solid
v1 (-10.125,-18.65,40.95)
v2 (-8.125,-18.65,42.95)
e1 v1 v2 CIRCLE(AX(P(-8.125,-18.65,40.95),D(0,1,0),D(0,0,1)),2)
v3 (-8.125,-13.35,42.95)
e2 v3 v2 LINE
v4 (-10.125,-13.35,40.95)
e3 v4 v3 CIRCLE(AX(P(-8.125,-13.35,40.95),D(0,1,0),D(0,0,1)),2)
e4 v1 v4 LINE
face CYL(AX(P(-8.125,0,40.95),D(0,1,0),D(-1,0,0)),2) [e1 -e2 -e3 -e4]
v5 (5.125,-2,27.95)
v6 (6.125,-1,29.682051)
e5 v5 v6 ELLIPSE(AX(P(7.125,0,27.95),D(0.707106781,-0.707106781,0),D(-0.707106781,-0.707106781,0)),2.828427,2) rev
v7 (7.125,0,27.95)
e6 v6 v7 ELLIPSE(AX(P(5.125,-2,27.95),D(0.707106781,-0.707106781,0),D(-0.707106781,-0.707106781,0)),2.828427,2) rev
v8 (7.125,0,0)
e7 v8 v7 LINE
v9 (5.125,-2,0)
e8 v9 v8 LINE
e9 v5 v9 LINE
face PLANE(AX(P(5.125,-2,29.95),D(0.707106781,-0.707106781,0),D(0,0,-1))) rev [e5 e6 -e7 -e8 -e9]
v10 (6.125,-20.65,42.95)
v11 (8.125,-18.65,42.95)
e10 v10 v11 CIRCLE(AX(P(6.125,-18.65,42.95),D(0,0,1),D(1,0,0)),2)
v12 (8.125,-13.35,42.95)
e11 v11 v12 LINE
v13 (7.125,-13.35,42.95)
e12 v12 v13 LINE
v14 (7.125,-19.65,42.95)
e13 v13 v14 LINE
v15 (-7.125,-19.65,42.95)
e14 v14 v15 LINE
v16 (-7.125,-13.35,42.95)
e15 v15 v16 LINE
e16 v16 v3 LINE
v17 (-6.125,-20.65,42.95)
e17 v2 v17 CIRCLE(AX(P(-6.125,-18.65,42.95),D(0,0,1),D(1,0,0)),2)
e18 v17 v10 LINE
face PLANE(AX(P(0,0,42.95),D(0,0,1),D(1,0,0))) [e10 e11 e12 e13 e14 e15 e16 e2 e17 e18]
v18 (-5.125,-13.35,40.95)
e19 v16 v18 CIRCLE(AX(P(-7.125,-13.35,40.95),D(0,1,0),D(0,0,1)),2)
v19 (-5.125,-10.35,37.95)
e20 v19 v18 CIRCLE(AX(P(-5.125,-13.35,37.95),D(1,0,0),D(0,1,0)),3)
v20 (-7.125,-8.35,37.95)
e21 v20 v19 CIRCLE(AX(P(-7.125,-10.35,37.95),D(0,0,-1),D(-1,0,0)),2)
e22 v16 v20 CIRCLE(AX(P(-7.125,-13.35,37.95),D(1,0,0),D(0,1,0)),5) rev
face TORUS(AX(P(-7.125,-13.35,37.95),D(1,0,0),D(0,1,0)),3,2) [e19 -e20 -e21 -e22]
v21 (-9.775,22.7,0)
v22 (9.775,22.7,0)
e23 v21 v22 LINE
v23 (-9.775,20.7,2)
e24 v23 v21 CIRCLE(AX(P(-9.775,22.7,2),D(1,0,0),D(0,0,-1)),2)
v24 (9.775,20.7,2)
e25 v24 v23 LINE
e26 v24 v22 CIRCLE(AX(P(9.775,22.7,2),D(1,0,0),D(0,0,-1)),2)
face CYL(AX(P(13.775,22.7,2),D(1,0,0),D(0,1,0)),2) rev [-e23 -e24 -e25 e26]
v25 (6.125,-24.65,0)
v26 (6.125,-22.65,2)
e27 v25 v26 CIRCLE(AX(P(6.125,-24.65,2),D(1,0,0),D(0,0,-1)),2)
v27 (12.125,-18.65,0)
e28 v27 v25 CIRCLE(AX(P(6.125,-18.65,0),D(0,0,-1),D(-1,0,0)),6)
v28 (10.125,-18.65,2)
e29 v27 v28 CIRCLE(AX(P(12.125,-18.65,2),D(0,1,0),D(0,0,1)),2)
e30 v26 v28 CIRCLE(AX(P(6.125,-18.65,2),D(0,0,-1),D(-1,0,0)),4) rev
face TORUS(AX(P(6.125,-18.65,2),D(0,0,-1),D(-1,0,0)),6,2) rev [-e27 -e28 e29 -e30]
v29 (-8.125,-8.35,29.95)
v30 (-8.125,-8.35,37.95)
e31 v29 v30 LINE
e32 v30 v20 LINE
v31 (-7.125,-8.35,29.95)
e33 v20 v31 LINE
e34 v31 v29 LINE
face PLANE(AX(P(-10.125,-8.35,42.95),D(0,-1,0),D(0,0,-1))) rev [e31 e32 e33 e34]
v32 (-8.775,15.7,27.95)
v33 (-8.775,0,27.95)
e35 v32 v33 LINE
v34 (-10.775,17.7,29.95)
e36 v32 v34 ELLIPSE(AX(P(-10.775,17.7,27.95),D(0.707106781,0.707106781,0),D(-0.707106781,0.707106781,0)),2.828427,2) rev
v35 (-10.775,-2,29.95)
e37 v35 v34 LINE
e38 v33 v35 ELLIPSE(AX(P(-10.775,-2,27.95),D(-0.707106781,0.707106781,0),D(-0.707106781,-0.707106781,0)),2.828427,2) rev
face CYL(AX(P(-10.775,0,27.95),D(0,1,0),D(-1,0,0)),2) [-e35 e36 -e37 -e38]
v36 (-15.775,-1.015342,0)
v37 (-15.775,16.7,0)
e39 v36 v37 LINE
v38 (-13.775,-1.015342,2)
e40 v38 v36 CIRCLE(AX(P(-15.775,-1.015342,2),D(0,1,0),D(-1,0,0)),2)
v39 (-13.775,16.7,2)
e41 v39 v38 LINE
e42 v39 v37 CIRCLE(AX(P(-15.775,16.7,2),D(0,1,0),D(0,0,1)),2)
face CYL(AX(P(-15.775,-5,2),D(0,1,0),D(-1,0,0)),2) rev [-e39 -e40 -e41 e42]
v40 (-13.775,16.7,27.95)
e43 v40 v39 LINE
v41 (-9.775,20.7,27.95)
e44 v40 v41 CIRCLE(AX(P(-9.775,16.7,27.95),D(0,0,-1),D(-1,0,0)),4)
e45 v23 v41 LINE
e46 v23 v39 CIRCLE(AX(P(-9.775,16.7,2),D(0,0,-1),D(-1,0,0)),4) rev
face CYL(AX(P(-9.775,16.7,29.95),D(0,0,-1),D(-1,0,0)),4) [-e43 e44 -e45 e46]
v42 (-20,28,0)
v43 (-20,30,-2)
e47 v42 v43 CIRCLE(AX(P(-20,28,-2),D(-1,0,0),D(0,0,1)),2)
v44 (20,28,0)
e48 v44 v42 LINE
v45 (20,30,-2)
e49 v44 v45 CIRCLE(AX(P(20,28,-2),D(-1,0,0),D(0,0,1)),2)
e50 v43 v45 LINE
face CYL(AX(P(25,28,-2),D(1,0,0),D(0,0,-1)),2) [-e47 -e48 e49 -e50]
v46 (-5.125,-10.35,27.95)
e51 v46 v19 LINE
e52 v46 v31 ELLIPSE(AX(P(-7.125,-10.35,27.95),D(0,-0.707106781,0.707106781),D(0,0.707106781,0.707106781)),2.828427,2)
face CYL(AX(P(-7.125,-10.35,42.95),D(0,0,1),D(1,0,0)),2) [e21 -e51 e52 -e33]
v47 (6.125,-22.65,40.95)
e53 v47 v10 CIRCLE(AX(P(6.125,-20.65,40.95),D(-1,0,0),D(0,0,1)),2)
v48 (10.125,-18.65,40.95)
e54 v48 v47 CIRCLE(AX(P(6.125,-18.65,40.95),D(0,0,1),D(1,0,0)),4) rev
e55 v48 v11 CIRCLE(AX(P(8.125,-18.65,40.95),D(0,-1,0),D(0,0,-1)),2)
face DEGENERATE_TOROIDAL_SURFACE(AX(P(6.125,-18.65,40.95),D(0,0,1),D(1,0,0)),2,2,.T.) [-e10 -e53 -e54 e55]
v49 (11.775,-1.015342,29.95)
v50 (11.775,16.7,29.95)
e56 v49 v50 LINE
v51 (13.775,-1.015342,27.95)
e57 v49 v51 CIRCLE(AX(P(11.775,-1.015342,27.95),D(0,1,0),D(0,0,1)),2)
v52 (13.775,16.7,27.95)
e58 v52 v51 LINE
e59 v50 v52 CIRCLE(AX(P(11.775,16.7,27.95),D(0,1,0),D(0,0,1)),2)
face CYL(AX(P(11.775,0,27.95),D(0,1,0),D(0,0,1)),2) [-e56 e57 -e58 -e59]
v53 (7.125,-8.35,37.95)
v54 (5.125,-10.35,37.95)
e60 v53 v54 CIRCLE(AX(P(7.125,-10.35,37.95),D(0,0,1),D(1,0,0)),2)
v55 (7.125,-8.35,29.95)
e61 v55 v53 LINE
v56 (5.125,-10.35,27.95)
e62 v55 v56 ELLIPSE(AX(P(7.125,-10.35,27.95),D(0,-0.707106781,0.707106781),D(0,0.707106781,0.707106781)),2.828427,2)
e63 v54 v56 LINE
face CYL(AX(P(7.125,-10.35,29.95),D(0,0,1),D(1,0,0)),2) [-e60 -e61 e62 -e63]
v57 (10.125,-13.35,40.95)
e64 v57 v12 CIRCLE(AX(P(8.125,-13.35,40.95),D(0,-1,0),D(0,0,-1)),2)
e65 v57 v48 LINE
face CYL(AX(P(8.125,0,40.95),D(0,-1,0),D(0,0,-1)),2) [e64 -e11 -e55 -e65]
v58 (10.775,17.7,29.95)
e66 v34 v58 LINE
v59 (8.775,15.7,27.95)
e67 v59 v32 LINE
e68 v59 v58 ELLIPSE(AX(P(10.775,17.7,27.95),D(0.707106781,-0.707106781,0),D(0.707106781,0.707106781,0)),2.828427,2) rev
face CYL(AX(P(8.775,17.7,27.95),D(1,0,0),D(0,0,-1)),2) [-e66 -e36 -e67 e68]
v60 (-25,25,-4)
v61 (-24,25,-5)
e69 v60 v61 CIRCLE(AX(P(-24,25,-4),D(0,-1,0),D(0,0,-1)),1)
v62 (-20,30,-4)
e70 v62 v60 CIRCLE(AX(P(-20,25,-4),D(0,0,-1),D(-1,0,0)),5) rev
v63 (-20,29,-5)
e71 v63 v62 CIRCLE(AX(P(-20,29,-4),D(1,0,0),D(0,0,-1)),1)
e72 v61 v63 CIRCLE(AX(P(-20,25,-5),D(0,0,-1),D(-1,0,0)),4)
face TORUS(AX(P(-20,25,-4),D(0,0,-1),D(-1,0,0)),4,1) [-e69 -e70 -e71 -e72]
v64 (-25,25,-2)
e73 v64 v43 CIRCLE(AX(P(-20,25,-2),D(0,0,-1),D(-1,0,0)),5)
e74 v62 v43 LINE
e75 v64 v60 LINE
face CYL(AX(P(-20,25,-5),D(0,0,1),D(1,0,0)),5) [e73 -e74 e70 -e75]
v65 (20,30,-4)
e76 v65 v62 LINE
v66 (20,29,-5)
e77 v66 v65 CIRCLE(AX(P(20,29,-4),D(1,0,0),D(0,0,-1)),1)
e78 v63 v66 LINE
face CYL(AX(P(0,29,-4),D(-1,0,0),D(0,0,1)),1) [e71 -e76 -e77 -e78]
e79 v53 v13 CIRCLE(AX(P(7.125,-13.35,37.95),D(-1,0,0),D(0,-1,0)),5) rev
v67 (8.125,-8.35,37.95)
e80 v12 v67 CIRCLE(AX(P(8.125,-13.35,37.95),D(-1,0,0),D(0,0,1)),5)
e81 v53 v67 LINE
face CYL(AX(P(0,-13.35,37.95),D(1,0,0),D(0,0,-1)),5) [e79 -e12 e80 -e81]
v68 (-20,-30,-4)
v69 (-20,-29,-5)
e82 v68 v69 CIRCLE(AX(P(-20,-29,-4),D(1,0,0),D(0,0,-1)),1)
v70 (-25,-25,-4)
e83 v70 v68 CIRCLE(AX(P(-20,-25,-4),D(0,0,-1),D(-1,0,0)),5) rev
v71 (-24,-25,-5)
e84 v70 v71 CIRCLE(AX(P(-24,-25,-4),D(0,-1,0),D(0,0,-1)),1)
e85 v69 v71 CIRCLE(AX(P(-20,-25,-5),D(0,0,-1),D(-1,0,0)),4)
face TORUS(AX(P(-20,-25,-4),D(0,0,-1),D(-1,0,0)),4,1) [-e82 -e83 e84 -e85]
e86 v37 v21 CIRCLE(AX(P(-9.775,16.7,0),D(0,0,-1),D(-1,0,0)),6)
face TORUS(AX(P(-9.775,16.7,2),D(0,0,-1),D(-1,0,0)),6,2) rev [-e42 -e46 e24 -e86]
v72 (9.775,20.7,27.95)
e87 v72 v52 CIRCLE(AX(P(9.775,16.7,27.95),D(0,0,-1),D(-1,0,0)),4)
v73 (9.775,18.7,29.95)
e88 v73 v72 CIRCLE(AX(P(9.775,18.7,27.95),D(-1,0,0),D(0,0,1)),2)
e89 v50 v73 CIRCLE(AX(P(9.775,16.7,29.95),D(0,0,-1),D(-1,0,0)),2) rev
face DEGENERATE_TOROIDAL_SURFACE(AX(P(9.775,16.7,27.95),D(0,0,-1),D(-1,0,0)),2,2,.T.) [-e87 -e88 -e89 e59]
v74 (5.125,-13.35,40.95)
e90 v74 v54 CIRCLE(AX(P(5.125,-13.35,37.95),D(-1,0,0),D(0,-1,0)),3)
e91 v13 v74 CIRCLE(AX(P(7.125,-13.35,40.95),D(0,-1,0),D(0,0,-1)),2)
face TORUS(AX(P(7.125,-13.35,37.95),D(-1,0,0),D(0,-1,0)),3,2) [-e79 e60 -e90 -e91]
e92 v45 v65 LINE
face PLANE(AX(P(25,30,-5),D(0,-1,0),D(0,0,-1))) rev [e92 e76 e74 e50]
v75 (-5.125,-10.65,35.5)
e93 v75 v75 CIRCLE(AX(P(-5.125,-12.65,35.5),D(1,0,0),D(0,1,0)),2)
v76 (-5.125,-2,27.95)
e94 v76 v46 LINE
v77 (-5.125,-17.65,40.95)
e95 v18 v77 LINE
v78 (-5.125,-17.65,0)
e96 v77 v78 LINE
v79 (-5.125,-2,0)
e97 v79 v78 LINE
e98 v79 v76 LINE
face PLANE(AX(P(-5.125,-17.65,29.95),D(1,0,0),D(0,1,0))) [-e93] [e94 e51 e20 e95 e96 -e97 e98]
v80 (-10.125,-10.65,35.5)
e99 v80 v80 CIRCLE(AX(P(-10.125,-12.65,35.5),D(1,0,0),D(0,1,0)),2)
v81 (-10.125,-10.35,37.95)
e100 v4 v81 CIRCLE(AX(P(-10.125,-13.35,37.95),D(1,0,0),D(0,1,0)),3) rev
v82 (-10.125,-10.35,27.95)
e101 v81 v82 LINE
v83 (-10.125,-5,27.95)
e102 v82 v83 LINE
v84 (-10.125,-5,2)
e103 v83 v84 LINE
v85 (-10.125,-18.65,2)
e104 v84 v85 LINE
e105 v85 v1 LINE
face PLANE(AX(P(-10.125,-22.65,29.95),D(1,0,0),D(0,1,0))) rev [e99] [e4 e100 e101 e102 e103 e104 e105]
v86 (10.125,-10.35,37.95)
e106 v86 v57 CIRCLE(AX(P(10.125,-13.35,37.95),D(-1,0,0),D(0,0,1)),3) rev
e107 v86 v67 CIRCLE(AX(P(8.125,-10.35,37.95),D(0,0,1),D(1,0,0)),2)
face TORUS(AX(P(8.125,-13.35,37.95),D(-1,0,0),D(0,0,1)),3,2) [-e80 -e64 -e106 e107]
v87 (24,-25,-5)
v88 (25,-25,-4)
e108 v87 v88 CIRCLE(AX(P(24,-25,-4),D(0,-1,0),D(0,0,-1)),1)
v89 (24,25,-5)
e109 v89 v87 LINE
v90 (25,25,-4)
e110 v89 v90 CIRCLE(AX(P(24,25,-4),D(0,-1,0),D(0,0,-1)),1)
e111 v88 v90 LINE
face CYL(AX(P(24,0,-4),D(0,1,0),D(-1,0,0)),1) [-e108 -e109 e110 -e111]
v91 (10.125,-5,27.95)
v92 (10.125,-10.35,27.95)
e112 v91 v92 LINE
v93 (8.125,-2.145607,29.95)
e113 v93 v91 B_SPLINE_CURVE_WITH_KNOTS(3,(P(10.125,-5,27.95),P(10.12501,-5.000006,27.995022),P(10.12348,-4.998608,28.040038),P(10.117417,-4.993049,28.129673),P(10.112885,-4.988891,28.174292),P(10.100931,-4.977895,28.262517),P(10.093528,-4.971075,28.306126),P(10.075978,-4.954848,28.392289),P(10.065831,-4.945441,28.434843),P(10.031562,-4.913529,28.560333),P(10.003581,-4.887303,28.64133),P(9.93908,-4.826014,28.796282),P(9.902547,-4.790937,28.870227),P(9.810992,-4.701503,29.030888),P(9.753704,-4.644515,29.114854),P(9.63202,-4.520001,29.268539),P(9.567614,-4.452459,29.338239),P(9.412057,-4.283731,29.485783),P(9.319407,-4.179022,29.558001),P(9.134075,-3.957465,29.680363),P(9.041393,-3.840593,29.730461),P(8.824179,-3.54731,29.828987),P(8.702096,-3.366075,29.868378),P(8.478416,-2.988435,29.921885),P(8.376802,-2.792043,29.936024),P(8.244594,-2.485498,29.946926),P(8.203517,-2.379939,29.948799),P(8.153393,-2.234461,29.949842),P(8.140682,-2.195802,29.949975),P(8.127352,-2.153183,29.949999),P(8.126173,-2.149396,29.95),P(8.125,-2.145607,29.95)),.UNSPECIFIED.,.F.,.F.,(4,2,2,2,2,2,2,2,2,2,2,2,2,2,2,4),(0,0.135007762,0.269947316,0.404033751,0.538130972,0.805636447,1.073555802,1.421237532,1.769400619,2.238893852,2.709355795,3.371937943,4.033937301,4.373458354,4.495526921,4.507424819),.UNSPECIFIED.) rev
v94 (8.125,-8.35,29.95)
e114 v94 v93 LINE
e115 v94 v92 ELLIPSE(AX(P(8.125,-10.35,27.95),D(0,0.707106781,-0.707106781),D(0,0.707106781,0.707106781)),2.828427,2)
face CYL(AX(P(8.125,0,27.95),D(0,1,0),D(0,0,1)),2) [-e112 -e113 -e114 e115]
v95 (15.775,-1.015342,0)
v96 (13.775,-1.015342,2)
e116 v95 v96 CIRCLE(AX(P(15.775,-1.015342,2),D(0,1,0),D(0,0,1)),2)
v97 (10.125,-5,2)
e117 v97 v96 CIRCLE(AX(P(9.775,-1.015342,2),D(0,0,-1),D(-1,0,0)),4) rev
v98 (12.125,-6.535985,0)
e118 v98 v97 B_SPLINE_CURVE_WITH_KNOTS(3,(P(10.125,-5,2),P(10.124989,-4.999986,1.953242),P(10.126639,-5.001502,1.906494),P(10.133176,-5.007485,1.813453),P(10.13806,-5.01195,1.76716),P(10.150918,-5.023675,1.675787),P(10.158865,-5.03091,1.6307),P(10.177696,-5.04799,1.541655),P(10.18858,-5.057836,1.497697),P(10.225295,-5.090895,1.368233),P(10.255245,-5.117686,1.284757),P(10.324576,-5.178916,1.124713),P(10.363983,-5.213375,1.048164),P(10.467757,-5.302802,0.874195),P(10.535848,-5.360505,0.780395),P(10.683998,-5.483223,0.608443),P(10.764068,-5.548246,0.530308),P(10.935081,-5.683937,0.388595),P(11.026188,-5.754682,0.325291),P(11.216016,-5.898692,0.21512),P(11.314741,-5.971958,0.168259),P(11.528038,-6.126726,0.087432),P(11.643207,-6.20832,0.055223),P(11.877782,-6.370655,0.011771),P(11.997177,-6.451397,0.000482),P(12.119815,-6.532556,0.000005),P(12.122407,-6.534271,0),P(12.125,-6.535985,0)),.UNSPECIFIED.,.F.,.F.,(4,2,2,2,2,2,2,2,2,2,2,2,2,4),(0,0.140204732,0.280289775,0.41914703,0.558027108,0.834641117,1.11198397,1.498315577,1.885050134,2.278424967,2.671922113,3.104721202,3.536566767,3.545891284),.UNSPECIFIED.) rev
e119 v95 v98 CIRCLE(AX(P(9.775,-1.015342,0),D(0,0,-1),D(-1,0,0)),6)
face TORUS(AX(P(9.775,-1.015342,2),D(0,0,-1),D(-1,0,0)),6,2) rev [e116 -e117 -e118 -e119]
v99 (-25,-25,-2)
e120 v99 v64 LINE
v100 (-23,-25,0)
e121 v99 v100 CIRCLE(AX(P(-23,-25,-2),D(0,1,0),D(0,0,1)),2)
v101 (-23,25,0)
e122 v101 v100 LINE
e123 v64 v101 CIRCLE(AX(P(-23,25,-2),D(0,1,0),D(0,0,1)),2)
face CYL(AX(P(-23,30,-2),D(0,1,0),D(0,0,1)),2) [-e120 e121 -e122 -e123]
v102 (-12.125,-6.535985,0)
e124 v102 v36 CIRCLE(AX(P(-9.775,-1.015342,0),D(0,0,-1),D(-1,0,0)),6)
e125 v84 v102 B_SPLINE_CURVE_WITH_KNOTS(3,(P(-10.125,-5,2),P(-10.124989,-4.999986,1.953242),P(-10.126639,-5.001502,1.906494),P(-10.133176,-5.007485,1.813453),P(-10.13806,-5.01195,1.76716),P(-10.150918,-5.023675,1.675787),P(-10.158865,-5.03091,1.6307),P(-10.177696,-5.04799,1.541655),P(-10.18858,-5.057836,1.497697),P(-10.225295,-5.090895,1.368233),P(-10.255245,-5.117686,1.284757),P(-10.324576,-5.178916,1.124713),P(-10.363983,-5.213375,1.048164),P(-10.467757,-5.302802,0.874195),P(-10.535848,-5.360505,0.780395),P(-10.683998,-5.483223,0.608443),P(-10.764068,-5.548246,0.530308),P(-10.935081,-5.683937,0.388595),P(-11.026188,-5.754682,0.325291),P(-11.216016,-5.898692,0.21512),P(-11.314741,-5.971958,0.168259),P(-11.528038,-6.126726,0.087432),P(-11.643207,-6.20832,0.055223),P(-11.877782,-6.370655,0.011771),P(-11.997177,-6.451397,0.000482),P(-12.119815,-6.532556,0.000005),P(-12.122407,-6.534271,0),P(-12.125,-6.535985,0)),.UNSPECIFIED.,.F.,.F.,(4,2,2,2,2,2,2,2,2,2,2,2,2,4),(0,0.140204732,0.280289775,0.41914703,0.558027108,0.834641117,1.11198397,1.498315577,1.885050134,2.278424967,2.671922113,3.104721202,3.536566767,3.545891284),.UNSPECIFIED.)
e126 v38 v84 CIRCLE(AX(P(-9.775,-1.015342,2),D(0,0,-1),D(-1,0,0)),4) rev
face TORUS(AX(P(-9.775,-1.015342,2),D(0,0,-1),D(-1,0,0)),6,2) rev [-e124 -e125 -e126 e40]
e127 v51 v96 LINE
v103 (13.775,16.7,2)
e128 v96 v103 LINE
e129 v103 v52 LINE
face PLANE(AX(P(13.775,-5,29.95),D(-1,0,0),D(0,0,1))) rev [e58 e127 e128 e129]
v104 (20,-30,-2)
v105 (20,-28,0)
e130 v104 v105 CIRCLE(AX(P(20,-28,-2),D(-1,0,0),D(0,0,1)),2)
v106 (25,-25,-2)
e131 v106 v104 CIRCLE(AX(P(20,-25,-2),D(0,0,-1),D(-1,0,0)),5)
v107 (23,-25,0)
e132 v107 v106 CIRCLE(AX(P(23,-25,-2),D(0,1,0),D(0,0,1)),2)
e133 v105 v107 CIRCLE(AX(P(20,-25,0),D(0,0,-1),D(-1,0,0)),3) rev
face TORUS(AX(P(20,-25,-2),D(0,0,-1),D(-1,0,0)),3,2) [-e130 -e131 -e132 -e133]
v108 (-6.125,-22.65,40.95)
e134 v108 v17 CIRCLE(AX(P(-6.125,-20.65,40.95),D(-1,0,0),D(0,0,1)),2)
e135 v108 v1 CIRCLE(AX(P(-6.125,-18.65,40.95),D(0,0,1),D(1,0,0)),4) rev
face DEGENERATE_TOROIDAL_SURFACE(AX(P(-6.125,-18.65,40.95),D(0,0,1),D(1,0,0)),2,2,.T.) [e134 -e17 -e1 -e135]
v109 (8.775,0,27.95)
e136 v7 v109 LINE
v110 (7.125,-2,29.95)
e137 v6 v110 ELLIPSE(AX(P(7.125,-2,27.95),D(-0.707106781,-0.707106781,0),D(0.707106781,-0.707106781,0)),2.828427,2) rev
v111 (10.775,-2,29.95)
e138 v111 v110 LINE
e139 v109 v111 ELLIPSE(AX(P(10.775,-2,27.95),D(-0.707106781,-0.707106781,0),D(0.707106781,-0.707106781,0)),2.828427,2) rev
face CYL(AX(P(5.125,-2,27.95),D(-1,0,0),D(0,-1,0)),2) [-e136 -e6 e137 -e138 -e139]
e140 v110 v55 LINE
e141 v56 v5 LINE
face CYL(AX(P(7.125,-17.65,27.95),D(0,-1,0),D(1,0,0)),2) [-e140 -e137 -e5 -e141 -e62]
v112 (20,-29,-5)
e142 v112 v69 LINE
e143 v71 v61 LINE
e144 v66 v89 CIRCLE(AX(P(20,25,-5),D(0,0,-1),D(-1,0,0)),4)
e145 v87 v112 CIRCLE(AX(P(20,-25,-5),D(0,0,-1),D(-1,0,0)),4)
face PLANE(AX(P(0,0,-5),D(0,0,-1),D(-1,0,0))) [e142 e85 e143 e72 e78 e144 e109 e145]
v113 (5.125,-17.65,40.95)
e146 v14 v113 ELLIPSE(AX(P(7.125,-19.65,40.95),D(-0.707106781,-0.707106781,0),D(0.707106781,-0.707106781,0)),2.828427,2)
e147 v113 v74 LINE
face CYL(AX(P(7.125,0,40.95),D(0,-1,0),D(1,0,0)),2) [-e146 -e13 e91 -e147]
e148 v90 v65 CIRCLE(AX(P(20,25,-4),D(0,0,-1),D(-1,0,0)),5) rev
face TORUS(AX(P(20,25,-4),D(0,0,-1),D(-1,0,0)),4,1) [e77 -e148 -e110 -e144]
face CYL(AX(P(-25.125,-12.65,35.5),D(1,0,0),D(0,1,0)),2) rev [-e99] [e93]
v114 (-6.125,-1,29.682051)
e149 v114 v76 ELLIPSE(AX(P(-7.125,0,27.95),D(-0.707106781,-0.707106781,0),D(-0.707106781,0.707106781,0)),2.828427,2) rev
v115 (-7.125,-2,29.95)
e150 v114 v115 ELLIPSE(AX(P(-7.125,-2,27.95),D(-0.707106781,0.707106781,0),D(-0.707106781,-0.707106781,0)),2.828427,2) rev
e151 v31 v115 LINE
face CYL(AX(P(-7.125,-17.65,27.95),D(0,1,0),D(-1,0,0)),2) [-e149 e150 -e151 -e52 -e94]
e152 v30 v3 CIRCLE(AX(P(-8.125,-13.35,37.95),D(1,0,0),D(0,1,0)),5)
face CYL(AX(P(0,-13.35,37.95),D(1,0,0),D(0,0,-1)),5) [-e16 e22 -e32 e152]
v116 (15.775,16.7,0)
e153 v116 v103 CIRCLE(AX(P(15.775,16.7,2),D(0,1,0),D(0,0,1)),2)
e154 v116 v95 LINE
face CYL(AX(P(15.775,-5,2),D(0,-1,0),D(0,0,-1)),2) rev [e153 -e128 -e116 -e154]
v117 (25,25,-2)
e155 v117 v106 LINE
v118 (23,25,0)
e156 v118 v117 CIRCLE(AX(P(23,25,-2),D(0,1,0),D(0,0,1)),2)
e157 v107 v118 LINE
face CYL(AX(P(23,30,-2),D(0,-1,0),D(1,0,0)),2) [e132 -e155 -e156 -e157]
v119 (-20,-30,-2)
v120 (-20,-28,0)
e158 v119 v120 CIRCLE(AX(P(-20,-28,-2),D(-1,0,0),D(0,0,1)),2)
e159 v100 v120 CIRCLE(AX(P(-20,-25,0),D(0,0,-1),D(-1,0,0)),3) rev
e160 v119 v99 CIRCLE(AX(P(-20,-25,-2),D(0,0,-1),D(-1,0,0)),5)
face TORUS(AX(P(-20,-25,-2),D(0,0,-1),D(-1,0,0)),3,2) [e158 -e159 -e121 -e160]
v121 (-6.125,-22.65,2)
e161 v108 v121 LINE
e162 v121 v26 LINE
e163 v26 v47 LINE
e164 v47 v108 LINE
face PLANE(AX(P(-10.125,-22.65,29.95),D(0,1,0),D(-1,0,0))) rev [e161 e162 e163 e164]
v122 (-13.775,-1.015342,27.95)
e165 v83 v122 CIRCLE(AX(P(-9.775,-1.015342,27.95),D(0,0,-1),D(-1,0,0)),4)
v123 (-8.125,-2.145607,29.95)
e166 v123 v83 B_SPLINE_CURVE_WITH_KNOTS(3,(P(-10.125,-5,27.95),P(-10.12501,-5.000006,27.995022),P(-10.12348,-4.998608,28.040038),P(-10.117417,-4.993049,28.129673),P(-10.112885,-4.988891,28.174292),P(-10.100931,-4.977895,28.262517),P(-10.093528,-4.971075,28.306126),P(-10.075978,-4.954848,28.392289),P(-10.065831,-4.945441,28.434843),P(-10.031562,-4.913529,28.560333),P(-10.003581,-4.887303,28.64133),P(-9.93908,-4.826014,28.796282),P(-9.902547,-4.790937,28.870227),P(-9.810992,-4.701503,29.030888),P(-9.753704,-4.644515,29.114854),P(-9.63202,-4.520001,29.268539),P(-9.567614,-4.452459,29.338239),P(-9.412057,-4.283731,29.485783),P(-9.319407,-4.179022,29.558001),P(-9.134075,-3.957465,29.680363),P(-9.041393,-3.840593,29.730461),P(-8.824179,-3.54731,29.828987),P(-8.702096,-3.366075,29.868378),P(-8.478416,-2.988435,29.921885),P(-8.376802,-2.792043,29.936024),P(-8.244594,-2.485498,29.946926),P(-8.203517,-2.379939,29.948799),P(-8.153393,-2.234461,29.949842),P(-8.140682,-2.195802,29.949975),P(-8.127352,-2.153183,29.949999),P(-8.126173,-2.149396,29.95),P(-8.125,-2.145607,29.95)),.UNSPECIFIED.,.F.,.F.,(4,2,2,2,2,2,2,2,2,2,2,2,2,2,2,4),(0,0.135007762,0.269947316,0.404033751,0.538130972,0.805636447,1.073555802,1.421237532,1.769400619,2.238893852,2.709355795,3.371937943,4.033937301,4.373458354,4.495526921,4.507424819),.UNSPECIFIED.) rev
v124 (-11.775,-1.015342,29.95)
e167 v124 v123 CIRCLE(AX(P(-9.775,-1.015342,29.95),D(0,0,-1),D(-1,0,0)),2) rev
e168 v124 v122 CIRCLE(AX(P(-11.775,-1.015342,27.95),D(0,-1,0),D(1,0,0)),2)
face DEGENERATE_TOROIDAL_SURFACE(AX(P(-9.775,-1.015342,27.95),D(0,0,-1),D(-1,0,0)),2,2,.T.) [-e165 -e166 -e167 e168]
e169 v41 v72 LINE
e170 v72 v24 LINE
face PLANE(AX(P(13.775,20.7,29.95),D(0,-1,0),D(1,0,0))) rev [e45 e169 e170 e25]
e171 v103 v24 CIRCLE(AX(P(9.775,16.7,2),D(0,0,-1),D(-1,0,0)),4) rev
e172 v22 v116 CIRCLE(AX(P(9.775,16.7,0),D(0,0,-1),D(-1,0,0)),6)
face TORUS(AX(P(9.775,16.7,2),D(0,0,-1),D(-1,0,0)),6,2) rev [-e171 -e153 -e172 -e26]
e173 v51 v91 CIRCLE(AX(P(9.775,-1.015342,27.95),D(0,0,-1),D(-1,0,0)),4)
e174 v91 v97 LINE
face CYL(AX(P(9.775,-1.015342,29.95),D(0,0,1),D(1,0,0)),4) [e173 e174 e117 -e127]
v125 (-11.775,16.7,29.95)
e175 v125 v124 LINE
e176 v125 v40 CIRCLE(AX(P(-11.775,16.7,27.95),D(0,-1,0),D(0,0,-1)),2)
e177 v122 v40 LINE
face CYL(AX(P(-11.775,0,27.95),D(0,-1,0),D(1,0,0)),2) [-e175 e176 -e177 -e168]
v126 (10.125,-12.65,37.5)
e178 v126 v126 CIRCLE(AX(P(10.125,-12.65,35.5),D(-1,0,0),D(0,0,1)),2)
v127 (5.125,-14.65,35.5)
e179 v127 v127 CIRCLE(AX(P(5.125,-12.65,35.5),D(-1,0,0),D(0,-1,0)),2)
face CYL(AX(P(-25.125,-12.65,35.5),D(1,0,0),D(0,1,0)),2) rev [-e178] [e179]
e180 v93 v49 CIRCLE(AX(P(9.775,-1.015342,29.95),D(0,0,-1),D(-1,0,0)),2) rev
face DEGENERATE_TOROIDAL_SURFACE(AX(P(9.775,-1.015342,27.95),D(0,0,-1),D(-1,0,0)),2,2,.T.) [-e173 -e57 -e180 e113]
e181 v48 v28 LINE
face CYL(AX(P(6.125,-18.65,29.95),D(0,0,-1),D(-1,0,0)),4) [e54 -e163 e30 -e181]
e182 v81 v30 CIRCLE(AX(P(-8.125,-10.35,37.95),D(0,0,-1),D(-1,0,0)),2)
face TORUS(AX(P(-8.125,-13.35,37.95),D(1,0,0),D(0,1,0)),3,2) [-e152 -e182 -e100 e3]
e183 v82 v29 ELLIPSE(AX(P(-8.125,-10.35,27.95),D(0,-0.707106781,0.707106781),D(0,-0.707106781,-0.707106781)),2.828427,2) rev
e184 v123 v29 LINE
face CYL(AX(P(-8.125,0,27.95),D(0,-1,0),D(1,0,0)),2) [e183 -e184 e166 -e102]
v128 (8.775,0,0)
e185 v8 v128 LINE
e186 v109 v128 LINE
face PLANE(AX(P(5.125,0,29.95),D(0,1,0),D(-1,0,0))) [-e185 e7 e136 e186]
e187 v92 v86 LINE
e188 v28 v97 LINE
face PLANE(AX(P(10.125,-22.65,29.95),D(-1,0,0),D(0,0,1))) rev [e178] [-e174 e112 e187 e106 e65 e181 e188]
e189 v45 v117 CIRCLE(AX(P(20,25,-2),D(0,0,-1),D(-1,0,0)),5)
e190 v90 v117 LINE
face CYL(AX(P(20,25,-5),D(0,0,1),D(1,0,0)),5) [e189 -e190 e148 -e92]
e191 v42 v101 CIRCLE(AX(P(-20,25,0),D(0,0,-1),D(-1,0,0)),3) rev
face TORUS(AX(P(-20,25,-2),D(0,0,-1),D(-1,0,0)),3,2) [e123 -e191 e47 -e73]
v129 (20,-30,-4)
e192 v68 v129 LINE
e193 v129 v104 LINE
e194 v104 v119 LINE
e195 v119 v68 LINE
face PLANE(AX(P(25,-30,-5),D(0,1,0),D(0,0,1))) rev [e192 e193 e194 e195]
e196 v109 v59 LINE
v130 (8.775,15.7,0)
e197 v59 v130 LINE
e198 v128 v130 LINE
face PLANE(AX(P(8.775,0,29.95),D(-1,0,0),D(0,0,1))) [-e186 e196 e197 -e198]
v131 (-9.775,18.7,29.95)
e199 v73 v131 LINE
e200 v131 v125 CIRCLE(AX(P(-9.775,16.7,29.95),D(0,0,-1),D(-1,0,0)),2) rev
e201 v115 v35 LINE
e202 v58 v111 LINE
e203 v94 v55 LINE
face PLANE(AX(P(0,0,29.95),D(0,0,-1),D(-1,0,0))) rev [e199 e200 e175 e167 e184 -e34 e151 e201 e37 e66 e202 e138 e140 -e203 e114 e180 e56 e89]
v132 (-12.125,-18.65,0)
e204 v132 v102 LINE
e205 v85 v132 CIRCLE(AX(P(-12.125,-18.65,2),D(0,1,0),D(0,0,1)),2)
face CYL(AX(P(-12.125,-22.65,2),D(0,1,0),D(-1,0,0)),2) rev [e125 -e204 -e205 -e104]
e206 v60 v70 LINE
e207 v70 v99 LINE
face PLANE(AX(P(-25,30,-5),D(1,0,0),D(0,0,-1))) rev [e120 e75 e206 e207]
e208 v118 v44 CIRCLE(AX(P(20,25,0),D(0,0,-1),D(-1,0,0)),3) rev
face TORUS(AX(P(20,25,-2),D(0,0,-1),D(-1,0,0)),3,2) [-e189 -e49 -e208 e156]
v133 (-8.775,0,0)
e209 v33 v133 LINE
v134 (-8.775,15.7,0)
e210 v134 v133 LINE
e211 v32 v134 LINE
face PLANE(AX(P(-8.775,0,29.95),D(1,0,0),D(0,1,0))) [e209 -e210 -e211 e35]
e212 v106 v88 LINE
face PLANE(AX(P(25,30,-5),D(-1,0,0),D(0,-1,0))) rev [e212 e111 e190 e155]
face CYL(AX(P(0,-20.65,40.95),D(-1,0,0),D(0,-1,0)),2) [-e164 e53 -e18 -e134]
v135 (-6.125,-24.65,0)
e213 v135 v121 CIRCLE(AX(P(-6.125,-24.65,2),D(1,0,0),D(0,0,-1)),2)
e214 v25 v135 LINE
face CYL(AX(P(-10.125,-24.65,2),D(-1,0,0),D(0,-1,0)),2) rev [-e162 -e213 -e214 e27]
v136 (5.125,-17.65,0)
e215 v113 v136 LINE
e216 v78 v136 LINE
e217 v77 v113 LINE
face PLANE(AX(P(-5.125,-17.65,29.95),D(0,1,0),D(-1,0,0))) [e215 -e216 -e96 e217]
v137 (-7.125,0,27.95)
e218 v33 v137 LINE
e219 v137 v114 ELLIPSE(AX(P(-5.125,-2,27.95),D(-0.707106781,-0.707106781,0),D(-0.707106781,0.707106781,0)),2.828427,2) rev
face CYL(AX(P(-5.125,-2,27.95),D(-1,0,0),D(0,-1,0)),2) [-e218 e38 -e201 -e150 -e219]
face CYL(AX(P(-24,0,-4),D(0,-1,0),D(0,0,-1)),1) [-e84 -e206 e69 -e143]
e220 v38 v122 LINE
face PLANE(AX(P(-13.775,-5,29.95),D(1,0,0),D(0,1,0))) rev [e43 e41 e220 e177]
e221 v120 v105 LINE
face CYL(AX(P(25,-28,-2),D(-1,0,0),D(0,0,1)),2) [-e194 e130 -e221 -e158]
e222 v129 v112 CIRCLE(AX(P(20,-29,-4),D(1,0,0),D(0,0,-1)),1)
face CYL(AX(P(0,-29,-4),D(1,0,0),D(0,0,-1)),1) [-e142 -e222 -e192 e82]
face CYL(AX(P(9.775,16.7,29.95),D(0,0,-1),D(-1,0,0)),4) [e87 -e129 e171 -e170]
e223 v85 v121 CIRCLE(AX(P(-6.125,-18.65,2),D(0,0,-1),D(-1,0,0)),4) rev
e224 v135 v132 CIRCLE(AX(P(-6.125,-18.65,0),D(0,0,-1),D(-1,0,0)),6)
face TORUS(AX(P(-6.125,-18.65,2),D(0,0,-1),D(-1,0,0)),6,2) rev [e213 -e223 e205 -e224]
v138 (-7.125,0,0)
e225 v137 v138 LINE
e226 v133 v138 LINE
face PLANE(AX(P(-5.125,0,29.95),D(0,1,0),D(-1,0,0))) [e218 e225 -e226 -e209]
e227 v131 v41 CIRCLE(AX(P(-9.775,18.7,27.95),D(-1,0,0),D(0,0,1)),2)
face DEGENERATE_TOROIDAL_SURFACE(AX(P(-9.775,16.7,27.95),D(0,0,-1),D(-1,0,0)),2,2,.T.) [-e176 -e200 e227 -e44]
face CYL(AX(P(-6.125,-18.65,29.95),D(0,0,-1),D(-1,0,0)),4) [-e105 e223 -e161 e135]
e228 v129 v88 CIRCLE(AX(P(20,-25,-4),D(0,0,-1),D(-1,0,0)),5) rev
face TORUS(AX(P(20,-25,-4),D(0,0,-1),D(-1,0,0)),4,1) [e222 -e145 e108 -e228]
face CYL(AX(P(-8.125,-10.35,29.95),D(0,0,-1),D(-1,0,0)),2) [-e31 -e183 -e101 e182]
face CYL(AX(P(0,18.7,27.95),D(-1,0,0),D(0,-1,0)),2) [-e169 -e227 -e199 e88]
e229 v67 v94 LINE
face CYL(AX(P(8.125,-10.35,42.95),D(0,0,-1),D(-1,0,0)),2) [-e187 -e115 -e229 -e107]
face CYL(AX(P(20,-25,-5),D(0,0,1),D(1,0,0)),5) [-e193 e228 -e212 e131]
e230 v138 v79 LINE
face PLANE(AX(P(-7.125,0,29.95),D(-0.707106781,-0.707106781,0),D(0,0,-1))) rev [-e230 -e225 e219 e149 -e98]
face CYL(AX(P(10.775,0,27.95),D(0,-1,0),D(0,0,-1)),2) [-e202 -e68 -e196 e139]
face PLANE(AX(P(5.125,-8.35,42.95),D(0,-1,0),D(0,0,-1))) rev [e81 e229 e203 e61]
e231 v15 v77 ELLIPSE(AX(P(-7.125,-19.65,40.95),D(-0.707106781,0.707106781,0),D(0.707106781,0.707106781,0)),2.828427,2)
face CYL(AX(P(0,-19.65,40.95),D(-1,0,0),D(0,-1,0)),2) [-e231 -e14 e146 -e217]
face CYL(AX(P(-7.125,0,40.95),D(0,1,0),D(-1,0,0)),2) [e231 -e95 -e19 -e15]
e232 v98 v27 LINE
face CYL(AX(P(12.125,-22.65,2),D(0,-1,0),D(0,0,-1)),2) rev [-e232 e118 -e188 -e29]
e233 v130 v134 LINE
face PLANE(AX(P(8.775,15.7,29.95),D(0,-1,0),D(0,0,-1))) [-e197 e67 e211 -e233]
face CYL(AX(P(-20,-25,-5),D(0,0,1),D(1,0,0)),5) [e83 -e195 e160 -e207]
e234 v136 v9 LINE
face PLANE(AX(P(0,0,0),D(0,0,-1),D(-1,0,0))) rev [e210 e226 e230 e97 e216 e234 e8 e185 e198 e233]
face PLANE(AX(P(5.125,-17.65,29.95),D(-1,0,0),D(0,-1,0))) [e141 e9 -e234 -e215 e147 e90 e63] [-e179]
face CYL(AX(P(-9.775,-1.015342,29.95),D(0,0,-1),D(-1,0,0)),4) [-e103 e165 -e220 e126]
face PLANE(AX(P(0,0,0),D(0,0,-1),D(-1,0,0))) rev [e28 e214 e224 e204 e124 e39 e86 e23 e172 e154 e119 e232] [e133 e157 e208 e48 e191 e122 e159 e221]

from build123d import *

# Parameters (mm, degrees)
AUFSATZ_LINEAR_AUSTRAGEN1_DEPTH = 29.95
AUFSATZ_LINEAR_AUSTRAGEN2_DEPTH = 13
SKIZZE4_R                       = 2
SCHNITT_LINEAR_AUSTRAGEN1_DEPTH = 20
SKIZZE5_W                       = 50
SKIZZE5_H                       = 60
AUFSATZ_LINEAR_AUSTRAGEN3_DEPTH = 5
FASE1_SIZE                      = 2
VERRUNDUNG1_R                   = 5
VERRUNDUNG4_R                   = 4
VERRUNDUNG7_R                   = 5
VERRUNDUNG5_R                   = 2
VERRUNDUNG8_R                   = 1
VERRUNDUNG9_R                   = 2
VERRUNDUNG12_R                  = 2


with BuildPart() as part:
    # Skizze1 → Aufsatz-Linear austragen1 (new body)
    with BuildSketch(Plane.XY):
        Polygon((-10.125, -22.65), (10.125, -22.65), (10.125, -5), (13.775, -5), (13.775, 20.7), (-13.775, 20.7), (-13.775, -5), (-10.125, -5), align=None)
        Polygon((-5.125, -17.65), (5.125, -17.65), (5.125, 0), (8.775, 0), (8.775, 15.7), (-8.775, 15.7), (-8.775, 0), (-5.125, 0), align=None, mode=Mode.SUBTRACT)
    extrude(amount=AUFSATZ_LINEAR_AUSTRAGEN1_DEPTH)

    # Skizze2 → Aufsatz-Linear austragen2 (add)
    with BuildSketch(Plane.XY.offset(29.95)):
        Polygon((5.125, -17.65), (5.125, -8.35), (10.125, -8.35), (10.125, -22.65), (-10.125, -22.65), (-10.125, -8.35), (-5.125, -8.35), (-5.125, -17.65), align=None)
    extrude(amount=AUFSATZ_LINEAR_AUSTRAGEN2_DEPTH)

    # Skizze4 → Schnitt-Linear austragen1 (cut, symmetric)
    with BuildSketch(Plane(origin=(-5.125, 0, 0), x_dir=(0, 0, -1), z_dir=(1, 0, 0))):
        with Locations(Location((-35.5, -12.65, 0), (0, 0, 180))):
            Circle(SKIZZE4_R)
    extrude(amount=SCHNITT_LINEAR_AUSTRAGEN1_DEPTH, both=True, mode=Mode.SUBTRACT)

    # Skizze5 → Aufsatz-Linear austragen3 (add)
    with BuildSketch(Plane(origin=(0, 0, 0), x_dir=(-1, 0, 0), z_dir=(0, 0, -1))):
        Rectangle(SKIZZE5_W, SKIZZE5_H)
    extrude(amount=AUFSATZ_LINEAR_AUSTRAGEN3_DEPTH)

    # Fase1
    fase1_edges = [part.edges().sort_by_distance(p)[0] for p in [
        (-5.125, 0, 14.975),
        (5.125, 0, 14.975),
    ]]
    chamfer(fase1_edges, length=FASE1_SIZE)

    # Verrundung1
    verrundung1_edges = [part.edges().sort_by_distance(p)[0] for p in [
        (-7.625, -8.35, 42.95),
        (7.625, -8.35, 42.95),
    ]]
    fillet(verrundung1_edges, radius=VERRUNDUNG1_R)

    # Verrundung4
    # the kernel refuses this fillet: 4 mm, written as the material it takes off along each edge
    with BuildSketch(Plane(origin=(13.775, -5, 0), x_dir=(-1, 0, 0), z_dir=(0, 0, 1))) as verrundung4_piece_1:
        with BuildLine():
            CenterArc((4, -3.984658078), VERRUNDUNG4_R, 95.019800132, 84.980199868)
            Line((0, -3.984658078), (0, 0))
            Line((0, 0), (3.65, 0))
        make_face()
    extrude(amount=39.911645195, mode=Mode.SUBTRACT)
    with BuildSketch(Plane(origin=(13.775, 20.7, 0), x_dir=(0, -1, 0), z_dir=(0, 0, 1)), Plane(origin=(-13.775, 20.7, 0), x_dir=(1, 0, 0), z_dir=(0, 0, 1))) as verrundung4_piece_2:
        with BuildLine():
            CenterArc((VERRUNDUNG4_R, -VERRUNDUNG4_R), VERRUNDUNG4_R, 90, 90)
            Line((0, -VERRUNDUNG4_R), (0, 0))
            Line((0, 0), (VERRUNDUNG4_R, 0))
        make_face()
    extrude(amount=39.95, mode=Mode.SUBTRACT)
    with BuildSketch(Plane(origin=(10.125, -22.65, 0), x_dir=(0, 1, 0), z_dir=(0, 0, 1))) as verrundung4_piece_3:
        with BuildLine():
            CenterArc((VERRUNDUNG4_R, VERRUNDUNG4_R), VERRUNDUNG4_R, 180, 90)
            Line((0, VERRUNDUNG4_R), (0, 0))
            Line((0, 0), (VERRUNDUNG4_R, 0))
        make_face()
    extrude(amount=52.95, mode=Mode.SUBTRACT)
    with BuildSketch(Plane(origin=(-10.125, -22.65, 52.95), x_dir=(1, 0, 0), z_dir=(0, 0, -1))) as verrundung4_piece_4:
        with BuildLine():
            CenterArc((VERRUNDUNG4_R, -VERRUNDUNG4_R), VERRUNDUNG4_R, 90, 90)
            Line((0, -VERRUNDUNG4_R), (0, 0))
            Line((0, 0), (VERRUNDUNG4_R, 0))
        make_face()
    extrude(amount=52.95, mode=Mode.SUBTRACT)
    with BuildSketch(Plane(origin=(-13.775, -5, 0), x_dir=(0, 1, 0), z_dir=(0, 0, 1))) as verrundung4_piece_5:
        with BuildLine():
            CenterArc((3.984658078, -4), VERRUNDUNG4_R, 90, 84.980199868)
            Line((0, -3.65), (0, 0))
            Line((0, 0), (3.984658078, 0))
        make_face()
    extrude(amount=39.911645195, mode=Mode.SUBTRACT)

    # Verrundung7
    verrundung7_edges = [part.edges().sort_by_distance(p)[0] for p in [
        (-25, -30, -2.5),
        (-25, 30, -2.5),
        (25, 30, -2.5),
        (25, -30, -2.5),
    ]]
    fillet(verrundung7_edges, radius=VERRUNDUNG7_R)

    # Verrundung5
    verrundung5_edges = [part.edges().sort_by_distance(p)[0] for p in [
        (-10.125, -11.825, 0),
        (0, -22.65, 0),
        (-13.775, 7.842329039, 0),
        (0, 20.7, 0),
        (13.775, 7.842329039, 0),
        (10.125, -11.825, 0),
        (-8.953427125, -21.478427125, 0),
        (-12.724576241, -3.717193139, 0),
        (-12.603427125, 19.528427125, 0),
        (12.724576241, -3.717193139, 0),
        (12.603427125, 19.528427125, 0),
        (8.953427125, -21.478427125, 0),
        (-25, 0, 0),
        (0, -30, 0),
        (25, 0, 0),
        (0, 30, 0),
        (23.535533906, 28.535533906, 0),
        (-23.535533906, 28.535533906, 0),
        (23.535533906, -28.535533906, 0),
        (-23.535533906, -28.535533906, 0),
    ]]
    fillet(verrundung5_edges, radius=VERRUNDUNG5_R)

    # Verrundung8
    verrundung8_edges = [part.edges().sort_by_distance(p)[0] for p in [
        (-25, 0, -5),
        (0, -30, -5),
        (0, 30, -5),
        (25, 0, -5),
        (23.535533906, 28.535533906, -5),
        (-23.535533906, 28.535533906, -5),
        (23.535533906, -28.535533906, -5),
        (-23.535533906, -28.535533906, -5),
    ]]
    fillet(verrundung8_edges, radius=VERRUNDUNG8_R)

    # Verrundung9
    # the kernel refuses this fillet: 2 mm, written as the material it takes off along each edge
    with BuildSketch(Plane(origin=(5.125, -17.65, 42.95), x_dir=(1, 0, 0), z_dir=(0, 1, 0)), Plane(origin=(-5.125, -13.35, 42.95), x_dir=(-1, 0, 0), z_dir=(0, -1, 0))) as verrundung9_piece_1:
        with BuildLine():
            CenterArc((VERRUNDUNG9_R, VERRUNDUNG9_R), VERRUNDUNG9_R, 180, 90)
            Line((0, VERRUNDUNG9_R), (0, 0))
            Line((0, 0), (VERRUNDUNG9_R, 0))
        make_face()
    extrude(amount=4.3, mode=Mode.SUBTRACT)
    with BuildSketch(Plane(origin=(5.125, -13.35, 37.95), x_dir=(0, 1, 0), z_dir=(0, 0, -1))) as verrundung9_piece_2:
        with BuildLine():
            CenterArc((5 - VERRUNDUNG9_R, VERRUNDUNG9_R), VERRUNDUNG9_R, 270, 90)
            Line((5 - VERRUNDUNG9_R, 0), (5, 0))
            Line((5, 0), (5, VERRUNDUNG9_R))
        make_face()
    revolve(axis=Axis((5.125, -13.35, 37.95), (1, 0, 0)), revolution_arc=90, mode=Mode.SUBTRACT)
    with BuildSketch(Plane(origin=(-5.125, -13.35, 37.95), x_dir=(0, 1, 0), z_dir=(0, 0, -1))) as verrundung9_piece_3:
        with BuildLine():
            CenterArc((5 - VERRUNDUNG9_R, -VERRUNDUNG9_R), VERRUNDUNG9_R, 0, 90)
            Line((5 - VERRUNDUNG9_R, 0), (5, 0))
            Line((5, 0), (5, -VERRUNDUNG9_R))
        make_face()
    revolve(axis=Axis((-5.125, -13.35, 37.95), (1, 0, 0)), revolution_arc=90, mode=Mode.SUBTRACT)
    with BuildSketch(Plane(origin=(5.125, -8.35, 29.95), x_dir=(1, 0, 0), z_dir=(0, 0, 1))) as verrundung9_piece_4:
        with BuildLine():
            CenterArc((VERRUNDUNG9_R, -VERRUNDUNG9_R), VERRUNDUNG9_R, 90, 90)
            Line((0, -VERRUNDUNG9_R), (0, 0))
            Line((0, 0), (VERRUNDUNG9_R, 0))
        make_face()
    extrude(amount=8, mode=Mode.SUBTRACT)
    with BuildSketch(Plane(origin=(-5.125, -8.35, 29.95), x_dir=(-1, 0, 0), z_dir=(0, 0, 1))) as verrundung9_piece_5:
        with BuildLine():
            CenterArc((VERRUNDUNG9_R, VERRUNDUNG9_R), VERRUNDUNG9_R, 180, 90)
            Line((0, VERRUNDUNG9_R), (0, 0))
            Line((0, 0), (VERRUNDUNG9_R, 0))
        make_face()
    extrude(amount=8, mode=Mode.SUBTRACT)
    with BuildSketch(Plane(origin=(5.125, -8.35, 29.95), x_dir=(1, 0, 0), z_dir=(0, 1, 0)), Plane(origin=(-5.125, 3, 29.95), x_dir=(-1, 0, 0), z_dir=(0, -1, 0))) as verrundung9_piece_6:
        with BuildLine():
            CenterArc((VERRUNDUNG9_R, VERRUNDUNG9_R), VERRUNDUNG9_R, 180, 90)
            Line((0, VERRUNDUNG9_R), (0, 0))
            Line((0, 0), (VERRUNDUNG9_R, 0))
        make_face()
    extrude(amount=11.35, mode=Mode.SUBTRACT)
    with BuildSketch(Plane(origin=(2.125, 0, 29.95), x_dir=(0, -1, 0), z_dir=(1, 0, 0)), Plane(origin=(-8.775, 0, 29.95), x_dir=(0, -1, 0), z_dir=(1, 0, 0))) as verrundung9_piece_7:
        with BuildLine():
            CenterArc((VERRUNDUNG9_R, VERRUNDUNG9_R), VERRUNDUNG9_R, 180, 90)
            Line((0, VERRUNDUNG9_R), (0, 0))
            Line((0, 0), (VERRUNDUNG9_R, 0))
        make_face()
    extrude(amount=6.65, mode=Mode.SUBTRACT)
    with BuildSketch(Plane(origin=(8.775, 0, 29.95), x_dir=(1, 0, 0), z_dir=(0, 1, 0)), Plane(origin=(-8.775, 15.7, 29.95), x_dir=(-1, 0, 0), z_dir=(0, -1, 0))) as verrundung9_piece_8:
        with BuildLine():
            CenterArc((VERRUNDUNG9_R, VERRUNDUNG9_R), VERRUNDUNG9_R, 180, 90)
            Line((0, VERRUNDUNG9_R), (0, 0))
            Line((0, 0), (VERRUNDUNG9_R, 0))
        make_face()
    extrude(amount=15.7, mode=Mode.SUBTRACT)
    with BuildSketch(Plane(origin=(8.775, 15.7, 29.95), x_dir=(0, 1, 0), z_dir=(-1, 0, 0))) as verrundung9_piece_9:
        with BuildLine():
            CenterArc((VERRUNDUNG9_R, VERRUNDUNG9_R), VERRUNDUNG9_R, 180, 90)
            Line((0, VERRUNDUNG9_R), (0, 0))
            Line((0, 0), (VERRUNDUNG9_R, 0))
        make_face()
    extrude(amount=17.55, mode=Mode.SUBTRACT)
    with BuildSketch(Plane(origin=(-5.125, -17.65, 42.95), x_dir=(0, -1, 0), z_dir=(1, 0, 0))) as verrundung9_piece_10:
        with BuildLine():
            CenterArc((VERRUNDUNG9_R, VERRUNDUNG9_R), VERRUNDUNG9_R, 180, 90)
            Line((0, VERRUNDUNG9_R), (0, 0))
            Line((0, 0), (VERRUNDUNG9_R, 0))
        make_face()
    extrude(amount=10.25, mode=Mode.SUBTRACT)
    with BuildSketch(Plane(origin=(5.125, -22.65, 42.95), x_dir=(1, 0, 0), z_dir=(0, 1, 0))) as verrundung9_piece_11a_section:
        with BuildLine():
            CenterArc((VERRUNDUNG9_R, VERRUNDUNG9_R), VERRUNDUNG9_R, 180, 90)
            Line((0, VERRUNDUNG9_R), (0, 0))
            Line((0, 0), (VERRUNDUNG9_R, 0))
        make_face()
    verrundung9_piece_11a = extrude(amount=9.3, mode=Mode.PRIVATE)
    verrundung9_piece_11a = split(verrundung9_piece_11a, bisect_by=Plane(origin=(5.577790229, -17.65, 42.497209771), z_dir=(0, -1, 0)), keep=Keep.TOP, mode=Mode.PRIVATE)
    with BuildSketch(Plane(origin=(-5.125, -17.65, 42.95), x_dir=(0, -1, 0), z_dir=(1, 0, 0))) as verrundung9_piece_11b_section:
        with BuildLine():
            CenterArc((VERRUNDUNG9_R, VERRUNDUNG9_R), VERRUNDUNG9_R, 180, 90)
            Line((0, VERRUNDUNG9_R), (0, 0))
            Line((0, 0), (VERRUNDUNG9_R, 0))
        make_face()
    verrundung9_piece_11b = extrude(amount=15.25, mode=Mode.PRIVATE)
    verrundung9_piece_11b = split(verrundung9_piece_11b, bisect_by=Plane(origin=(5.125, -18.102790229, 42.497209771), z_dir=(1, 0, 0)), keep=Keep.TOP, mode=Mode.PRIVATE)
    verrundung9_piece_11 = verrundung9_piece_11a & verrundung9_piece_11b
    add(verrundung9_piece_11, mode=Mode.SUBTRACT)
    with BuildSketch(Plane(origin=(-10.125, -17.65, 42.95), x_dir=(0, -1, 0), z_dir=(1, 0, 0))) as verrundung9_piece_12a_section:
        with BuildLine():
            CenterArc((VERRUNDUNG9_R, VERRUNDUNG9_R), VERRUNDUNG9_R, 180, 90)
            Line((0, VERRUNDUNG9_R), (0, 0))
            Line((0, 0), (VERRUNDUNG9_R, 0))
        make_face()
    verrundung9_piece_12a = extrude(amount=15.25, mode=Mode.PRIVATE)
    verrundung9_piece_12a = split(verrundung9_piece_12a, bisect_by=Plane(origin=(-5.125, -18.102790229, 42.497209771), z_dir=(-1, 0, 0)), keep=Keep.TOP, mode=Mode.PRIVATE)
    with BuildSketch(Plane(origin=(-5.125, -13.35, 42.95), x_dir=(-1, 0, 0), z_dir=(0, -1, 0))) as verrundung9_piece_12b_section:
        with BuildLine():
            CenterArc((VERRUNDUNG9_R, VERRUNDUNG9_R), VERRUNDUNG9_R, 180, 90)
            Line((0, VERRUNDUNG9_R), (0, 0))
            Line((0, 0), (VERRUNDUNG9_R, 0))
        make_face()
    verrundung9_piece_12b = extrude(amount=9.3, mode=Mode.PRIVATE)
    verrundung9_piece_12b = split(verrundung9_piece_12b, bisect_by=Plane(origin=(-5.577790229, -17.65, 42.497209771), z_dir=(0, -1, 0)), keep=Keep.TOP, mode=Mode.PRIVATE)
    verrundung9_piece_12 = verrundung9_piece_12a & verrundung9_piece_12b
    add(verrundung9_piece_12, mode=Mode.SUBTRACT)
    with BuildSketch(Plane(origin=(5.125, -13.35, 29.95), x_dir=(1, 0, 0), z_dir=(0, 1, 0))) as verrundung9_piece_13a_section:
        with BuildLine():
            CenterArc((VERRUNDUNG9_R, VERRUNDUNG9_R), VERRUNDUNG9_R, 180, 90)
            Line((0, VERRUNDUNG9_R), (0, 0))
            Line((0, 0), (VERRUNDUNG9_R, 0))
        make_face()
    verrundung9_piece_13a = extrude(amount=16.35, mode=Mode.PRIVATE)
    verrundung9_piece_13a = split(verrundung9_piece_13a, bisect_by=Plane(origin=(5.577790229, -8.35, 29.497209771), z_dir=(0, -1, 0)), keep=Keep.TOP, mode=Mode.PRIVATE)
    with BuildSketch(Plane(origin=(5.125, -8.35, 24.95), x_dir=(1, 0, 0), z_dir=(0, 0, 1))) as verrundung9_piece_13b_section:
        with BuildLine():
            CenterArc((VERRUNDUNG9_R, -VERRUNDUNG9_R), VERRUNDUNG9_R, 90, 90)
            Line((0, -VERRUNDUNG9_R), (0, 0))
            Line((0, 0), (VERRUNDUNG9_R, 0))
        make_face()
    verrundung9_piece_13b = extrude(amount=13, mode=Mode.PRIVATE)
    verrundung9_piece_13b = split(verrundung9_piece_13b, bisect_by=Plane(origin=(5.577790229, -8.802790229, 29.95), z_dir=(0, 0, -1)), keep=Keep.TOP, mode=Mode.PRIVATE)
    verrundung9_piece_13 = verrundung9_piece_13a & verrundung9_piece_13b
    add(verrundung9_piece_13, mode=Mode.SUBTRACT)
    with BuildSketch(Plane(origin=(-5.125, 3, 29.95), x_dir=(-1, 0, 0), z_dir=(0, -1, 0))) as verrundung9_piece_14a_section:
        with BuildLine():
            CenterArc((VERRUNDUNG9_R, VERRUNDUNG9_R), VERRUNDUNG9_R, 180, 90)
            Line((0, VERRUNDUNG9_R), (0, 0))
            Line((0, 0), (VERRUNDUNG9_R, 0))
        make_face()
    verrundung9_piece_14a = extrude(amount=16.35, mode=Mode.PRIVATE)
    verrundung9_piece_14a = split(verrundung9_piece_14a, bisect_by=Plane(origin=(-5.577790229, -8.35, 29.497209771), z_dir=(0, -1, 0)), keep=Keep.TOP, mode=Mode.PRIVATE)
    with BuildSketch(Plane(origin=(-5.125, -8.35, 24.95), x_dir=(-1, 0, 0), z_dir=(0, 0, 1))) as verrundung9_piece_14b_section:
        with BuildLine():
            CenterArc((VERRUNDUNG9_R, VERRUNDUNG9_R), VERRUNDUNG9_R, 180, 90)
            Line((0, VERRUNDUNG9_R), (0, 0))
            Line((0, 0), (VERRUNDUNG9_R, 0))
        make_face()
    verrundung9_piece_14b = extrude(amount=13, mode=Mode.PRIVATE)
    verrundung9_piece_14b = split(verrundung9_piece_14b, bisect_by=Plane(origin=(-5.577790229, -8.802790229, 29.95), z_dir=(0, 0, -1)), keep=Keep.TOP, mode=Mode.PRIVATE)
    verrundung9_piece_14 = verrundung9_piece_14a & verrundung9_piece_14b
    add(verrundung9_piece_14, mode=Mode.SUBTRACT)
    with BuildSketch(Plane(origin=(2.125, 0, 29.95), x_dir=(0, -1, 0), z_dir=(1, 0, 0))) as verrundung9_piece_15a_section:
        with BuildLine():
            CenterArc((VERRUNDUNG9_R, VERRUNDUNG9_R), VERRUNDUNG9_R, 180, 90)
            Line((0, VERRUNDUNG9_R), (0, 0))
            Line((0, 0), (VERRUNDUNG9_R, 0))
        make_face()
    verrundung9_piece_15a = extrude(amount=11.65, mode=Mode.PRIVATE)
    verrundung9_piece_15a = split(verrundung9_piece_15a, bisect_by=Plane(origin=(8.775, -0.452790229, 29.497209771), z_dir=(1, 0, 0)), keep=Keep.TOP, mode=Mode.PRIVATE)
    with BuildSketch(Plane(origin=(8.775, -5, 29.95), x_dir=(1, 0, 0), z_dir=(0, 1, 0))) as verrundung9_piece_15b_section:
        with BuildLine():
            CenterArc((VERRUNDUNG9_R, VERRUNDUNG9_R), VERRUNDUNG9_R, 180, 90)
            Line((0, VERRUNDUNG9_R), (0, 0))
            Line((0, 0), (VERRUNDUNG9_R, 0))
        make_face()
    verrundung9_piece_15b = extrude(amount=20.7, mode=Mode.PRIVATE)
    verrundung9_piece_15b = split(verrundung9_piece_15b, bisect_by=Plane(origin=(9.227790229, 0, 29.497209771), z_dir=(0, -1, 0)), keep=Keep.TOP, mode=Mode.PRIVATE)
    verrundung9_piece_15 = verrundung9_piece_15a & verrundung9_piece_15b
    add(verrundung9_piece_15, mode=Mode.SUBTRACT)
    with BuildSketch(Plane(origin=(8.775, 0, 29.95), x_dir=(1, 0, 0), z_dir=(0, 1, 0))) as verrundung9_piece_16a_section:
        with BuildLine():
            CenterArc((VERRUNDUNG9_R, VERRUNDUNG9_R), VERRUNDUNG9_R, 180, 90)
            Line((0, VERRUNDUNG9_R), (0, 0))
            Line((0, 0), (VERRUNDUNG9_R, 0))
        make_face()
    verrundung9_piece_16a = extrude(amount=20.7, mode=Mode.PRIVATE)
    verrundung9_piece_16a = split(verrundung9_piece_16a, bisect_by=Plane(origin=(9.227790229, 15.7, 29.497209771), z_dir=(0, 1, 0)), keep=Keep.TOP, mode=Mode.PRIVATE)
    with BuildSketch(Plane(origin=(13.775, 15.7, 29.95), x_dir=(0, 1, 0), z_dir=(-1, 0, 0))) as verrundung9_piece_16b_section:
        with BuildLine():
            CenterArc((VERRUNDUNG9_R, VERRUNDUNG9_R), VERRUNDUNG9_R, 180, 90)
            Line((0, VERRUNDUNG9_R), (0, 0))
            Line((0, 0), (VERRUNDUNG9_R, 0))
        make_face()
    verrundung9_piece_16b = extrude(amount=22.55, mode=Mode.PRIVATE)
    verrundung9_piece_16b = split(verrundung9_piece_16b, bisect_by=Plane(origin=(8.775, 16.152790229, 29.497209771), z_dir=(1, 0, 0)), keep=Keep.TOP, mode=Mode.PRIVATE)
    verrundung9_piece_16 = verrundung9_piece_16a & verrundung9_piece_16b
    add(verrundung9_piece_16, mode=Mode.SUBTRACT)
    with BuildSketch(Plane(origin=(8.775, 15.7, 29.95), x_dir=(0, 1, 0), z_dir=(-1, 0, 0))) as verrundung9_piece_17a_section:
        with BuildLine():
            CenterArc((VERRUNDUNG9_R, VERRUNDUNG9_R), VERRUNDUNG9_R, 180, 90)
            Line((0, VERRUNDUNG9_R), (0, 0))
            Line((0, 0), (VERRUNDUNG9_R, 0))
        make_face()
    verrundung9_piece_17a = extrude(amount=22.55, mode=Mode.PRIVATE)
    verrundung9_piece_17a = split(verrundung9_piece_17a, bisect_by=Plane(origin=(-8.775, 16.152790229, 29.497209771), z_dir=(-1, 0, 0)), keep=Keep.TOP, mode=Mode.PRIVATE)
    with BuildSketch(Plane(origin=(-8.775, 20.7, 29.95), x_dir=(-1, 0, 0), z_dir=(0, -1, 0))) as verrundung9_piece_17b_section:
        with BuildLine():
            CenterArc((VERRUNDUNG9_R, VERRUNDUNG9_R), VERRUNDUNG9_R, 180, 90)
            Line((0, VERRUNDUNG9_R), (0, 0))
            Line((0, 0), (VERRUNDUNG9_R, 0))
        make_face()
    verrundung9_piece_17b = extrude(amount=20.7, mode=Mode.PRIVATE)
    verrundung9_piece_17b = split(verrundung9_piece_17b, bisect_by=Plane(origin=(-9.227790229, 15.7, 29.497209771), z_dir=(0, 1, 0)), keep=Keep.TOP, mode=Mode.PRIVATE)
    verrundung9_piece_17 = verrundung9_piece_17a & verrundung9_piece_17b
    add(verrundung9_piece_17, mode=Mode.SUBTRACT)
    with BuildSketch(Plane(origin=(-8.775, 15.7, 29.95), x_dir=(-1, 0, 0), z_dir=(0, -1, 0))) as verrundung9_piece_18a_section:
        with BuildLine():
            CenterArc((VERRUNDUNG9_R, VERRUNDUNG9_R), VERRUNDUNG9_R, 180, 90)
            Line((0, VERRUNDUNG9_R), (0, 0))
            Line((0, 0), (VERRUNDUNG9_R, 0))
        make_face()
    verrundung9_piece_18a = extrude(amount=20.7, mode=Mode.PRIVATE)
    verrundung9_piece_18a = split(verrundung9_piece_18a, bisect_by=Plane(origin=(-9.227790229, 0, 29.497209771), z_dir=(0, -1, 0)), keep=Keep.TOP, mode=Mode.PRIVATE)
    with BuildSketch(Plane(origin=(-13.775, 0, 29.95), x_dir=(0, -1, 0), z_dir=(1, 0, 0))) as verrundung9_piece_18b_section:
        with BuildLine():
            CenterArc((VERRUNDUNG9_R, VERRUNDUNG9_R), VERRUNDUNG9_R, 180, 90)
            Line((0, VERRUNDUNG9_R), (0, 0))
            Line((0, 0), (VERRUNDUNG9_R, 0))
        make_face()
    verrundung9_piece_18b = extrude(amount=11.65, mode=Mode.PRIVATE)
    verrundung9_piece_18b = split(verrundung9_piece_18b, bisect_by=Plane(origin=(-8.775, -0.452790229, 29.497209771), z_dir=(-1, 0, 0)), keep=Keep.TOP, mode=Mode.PRIVATE)
    verrundung9_piece_18 = verrundung9_piece_18a & verrundung9_piece_18b
    add(verrundung9_piece_18, mode=Mode.SUBTRACT)

    # Verrundung12
    verrundung12_edges = [part.edges().sort_by_distance(p)[0] for p in [
        (-12.724576241, -3.717193139, 29.95),
        (-13.775, 7.842329039, 29.95),
        (0, 20.7, 29.95),
        (12.724576241, -3.717193139, 29.95),
        (13.775, 7.842329039, 29.95),
        (10.125, -6.675, 29.95),
        (10.125, -8.35, 33.95),
        (-10.125, -8.35, 33.95),
        (-10.125, -16, 42.95),
        (0, -22.65, 42.95),
        (10.125, -16, 42.95),
        (-10.125, -6.675, 29.95),
    ]]
    fillet(verrundung12_edges, radius=VERRUNDUNG12_R)


solid = part.part
